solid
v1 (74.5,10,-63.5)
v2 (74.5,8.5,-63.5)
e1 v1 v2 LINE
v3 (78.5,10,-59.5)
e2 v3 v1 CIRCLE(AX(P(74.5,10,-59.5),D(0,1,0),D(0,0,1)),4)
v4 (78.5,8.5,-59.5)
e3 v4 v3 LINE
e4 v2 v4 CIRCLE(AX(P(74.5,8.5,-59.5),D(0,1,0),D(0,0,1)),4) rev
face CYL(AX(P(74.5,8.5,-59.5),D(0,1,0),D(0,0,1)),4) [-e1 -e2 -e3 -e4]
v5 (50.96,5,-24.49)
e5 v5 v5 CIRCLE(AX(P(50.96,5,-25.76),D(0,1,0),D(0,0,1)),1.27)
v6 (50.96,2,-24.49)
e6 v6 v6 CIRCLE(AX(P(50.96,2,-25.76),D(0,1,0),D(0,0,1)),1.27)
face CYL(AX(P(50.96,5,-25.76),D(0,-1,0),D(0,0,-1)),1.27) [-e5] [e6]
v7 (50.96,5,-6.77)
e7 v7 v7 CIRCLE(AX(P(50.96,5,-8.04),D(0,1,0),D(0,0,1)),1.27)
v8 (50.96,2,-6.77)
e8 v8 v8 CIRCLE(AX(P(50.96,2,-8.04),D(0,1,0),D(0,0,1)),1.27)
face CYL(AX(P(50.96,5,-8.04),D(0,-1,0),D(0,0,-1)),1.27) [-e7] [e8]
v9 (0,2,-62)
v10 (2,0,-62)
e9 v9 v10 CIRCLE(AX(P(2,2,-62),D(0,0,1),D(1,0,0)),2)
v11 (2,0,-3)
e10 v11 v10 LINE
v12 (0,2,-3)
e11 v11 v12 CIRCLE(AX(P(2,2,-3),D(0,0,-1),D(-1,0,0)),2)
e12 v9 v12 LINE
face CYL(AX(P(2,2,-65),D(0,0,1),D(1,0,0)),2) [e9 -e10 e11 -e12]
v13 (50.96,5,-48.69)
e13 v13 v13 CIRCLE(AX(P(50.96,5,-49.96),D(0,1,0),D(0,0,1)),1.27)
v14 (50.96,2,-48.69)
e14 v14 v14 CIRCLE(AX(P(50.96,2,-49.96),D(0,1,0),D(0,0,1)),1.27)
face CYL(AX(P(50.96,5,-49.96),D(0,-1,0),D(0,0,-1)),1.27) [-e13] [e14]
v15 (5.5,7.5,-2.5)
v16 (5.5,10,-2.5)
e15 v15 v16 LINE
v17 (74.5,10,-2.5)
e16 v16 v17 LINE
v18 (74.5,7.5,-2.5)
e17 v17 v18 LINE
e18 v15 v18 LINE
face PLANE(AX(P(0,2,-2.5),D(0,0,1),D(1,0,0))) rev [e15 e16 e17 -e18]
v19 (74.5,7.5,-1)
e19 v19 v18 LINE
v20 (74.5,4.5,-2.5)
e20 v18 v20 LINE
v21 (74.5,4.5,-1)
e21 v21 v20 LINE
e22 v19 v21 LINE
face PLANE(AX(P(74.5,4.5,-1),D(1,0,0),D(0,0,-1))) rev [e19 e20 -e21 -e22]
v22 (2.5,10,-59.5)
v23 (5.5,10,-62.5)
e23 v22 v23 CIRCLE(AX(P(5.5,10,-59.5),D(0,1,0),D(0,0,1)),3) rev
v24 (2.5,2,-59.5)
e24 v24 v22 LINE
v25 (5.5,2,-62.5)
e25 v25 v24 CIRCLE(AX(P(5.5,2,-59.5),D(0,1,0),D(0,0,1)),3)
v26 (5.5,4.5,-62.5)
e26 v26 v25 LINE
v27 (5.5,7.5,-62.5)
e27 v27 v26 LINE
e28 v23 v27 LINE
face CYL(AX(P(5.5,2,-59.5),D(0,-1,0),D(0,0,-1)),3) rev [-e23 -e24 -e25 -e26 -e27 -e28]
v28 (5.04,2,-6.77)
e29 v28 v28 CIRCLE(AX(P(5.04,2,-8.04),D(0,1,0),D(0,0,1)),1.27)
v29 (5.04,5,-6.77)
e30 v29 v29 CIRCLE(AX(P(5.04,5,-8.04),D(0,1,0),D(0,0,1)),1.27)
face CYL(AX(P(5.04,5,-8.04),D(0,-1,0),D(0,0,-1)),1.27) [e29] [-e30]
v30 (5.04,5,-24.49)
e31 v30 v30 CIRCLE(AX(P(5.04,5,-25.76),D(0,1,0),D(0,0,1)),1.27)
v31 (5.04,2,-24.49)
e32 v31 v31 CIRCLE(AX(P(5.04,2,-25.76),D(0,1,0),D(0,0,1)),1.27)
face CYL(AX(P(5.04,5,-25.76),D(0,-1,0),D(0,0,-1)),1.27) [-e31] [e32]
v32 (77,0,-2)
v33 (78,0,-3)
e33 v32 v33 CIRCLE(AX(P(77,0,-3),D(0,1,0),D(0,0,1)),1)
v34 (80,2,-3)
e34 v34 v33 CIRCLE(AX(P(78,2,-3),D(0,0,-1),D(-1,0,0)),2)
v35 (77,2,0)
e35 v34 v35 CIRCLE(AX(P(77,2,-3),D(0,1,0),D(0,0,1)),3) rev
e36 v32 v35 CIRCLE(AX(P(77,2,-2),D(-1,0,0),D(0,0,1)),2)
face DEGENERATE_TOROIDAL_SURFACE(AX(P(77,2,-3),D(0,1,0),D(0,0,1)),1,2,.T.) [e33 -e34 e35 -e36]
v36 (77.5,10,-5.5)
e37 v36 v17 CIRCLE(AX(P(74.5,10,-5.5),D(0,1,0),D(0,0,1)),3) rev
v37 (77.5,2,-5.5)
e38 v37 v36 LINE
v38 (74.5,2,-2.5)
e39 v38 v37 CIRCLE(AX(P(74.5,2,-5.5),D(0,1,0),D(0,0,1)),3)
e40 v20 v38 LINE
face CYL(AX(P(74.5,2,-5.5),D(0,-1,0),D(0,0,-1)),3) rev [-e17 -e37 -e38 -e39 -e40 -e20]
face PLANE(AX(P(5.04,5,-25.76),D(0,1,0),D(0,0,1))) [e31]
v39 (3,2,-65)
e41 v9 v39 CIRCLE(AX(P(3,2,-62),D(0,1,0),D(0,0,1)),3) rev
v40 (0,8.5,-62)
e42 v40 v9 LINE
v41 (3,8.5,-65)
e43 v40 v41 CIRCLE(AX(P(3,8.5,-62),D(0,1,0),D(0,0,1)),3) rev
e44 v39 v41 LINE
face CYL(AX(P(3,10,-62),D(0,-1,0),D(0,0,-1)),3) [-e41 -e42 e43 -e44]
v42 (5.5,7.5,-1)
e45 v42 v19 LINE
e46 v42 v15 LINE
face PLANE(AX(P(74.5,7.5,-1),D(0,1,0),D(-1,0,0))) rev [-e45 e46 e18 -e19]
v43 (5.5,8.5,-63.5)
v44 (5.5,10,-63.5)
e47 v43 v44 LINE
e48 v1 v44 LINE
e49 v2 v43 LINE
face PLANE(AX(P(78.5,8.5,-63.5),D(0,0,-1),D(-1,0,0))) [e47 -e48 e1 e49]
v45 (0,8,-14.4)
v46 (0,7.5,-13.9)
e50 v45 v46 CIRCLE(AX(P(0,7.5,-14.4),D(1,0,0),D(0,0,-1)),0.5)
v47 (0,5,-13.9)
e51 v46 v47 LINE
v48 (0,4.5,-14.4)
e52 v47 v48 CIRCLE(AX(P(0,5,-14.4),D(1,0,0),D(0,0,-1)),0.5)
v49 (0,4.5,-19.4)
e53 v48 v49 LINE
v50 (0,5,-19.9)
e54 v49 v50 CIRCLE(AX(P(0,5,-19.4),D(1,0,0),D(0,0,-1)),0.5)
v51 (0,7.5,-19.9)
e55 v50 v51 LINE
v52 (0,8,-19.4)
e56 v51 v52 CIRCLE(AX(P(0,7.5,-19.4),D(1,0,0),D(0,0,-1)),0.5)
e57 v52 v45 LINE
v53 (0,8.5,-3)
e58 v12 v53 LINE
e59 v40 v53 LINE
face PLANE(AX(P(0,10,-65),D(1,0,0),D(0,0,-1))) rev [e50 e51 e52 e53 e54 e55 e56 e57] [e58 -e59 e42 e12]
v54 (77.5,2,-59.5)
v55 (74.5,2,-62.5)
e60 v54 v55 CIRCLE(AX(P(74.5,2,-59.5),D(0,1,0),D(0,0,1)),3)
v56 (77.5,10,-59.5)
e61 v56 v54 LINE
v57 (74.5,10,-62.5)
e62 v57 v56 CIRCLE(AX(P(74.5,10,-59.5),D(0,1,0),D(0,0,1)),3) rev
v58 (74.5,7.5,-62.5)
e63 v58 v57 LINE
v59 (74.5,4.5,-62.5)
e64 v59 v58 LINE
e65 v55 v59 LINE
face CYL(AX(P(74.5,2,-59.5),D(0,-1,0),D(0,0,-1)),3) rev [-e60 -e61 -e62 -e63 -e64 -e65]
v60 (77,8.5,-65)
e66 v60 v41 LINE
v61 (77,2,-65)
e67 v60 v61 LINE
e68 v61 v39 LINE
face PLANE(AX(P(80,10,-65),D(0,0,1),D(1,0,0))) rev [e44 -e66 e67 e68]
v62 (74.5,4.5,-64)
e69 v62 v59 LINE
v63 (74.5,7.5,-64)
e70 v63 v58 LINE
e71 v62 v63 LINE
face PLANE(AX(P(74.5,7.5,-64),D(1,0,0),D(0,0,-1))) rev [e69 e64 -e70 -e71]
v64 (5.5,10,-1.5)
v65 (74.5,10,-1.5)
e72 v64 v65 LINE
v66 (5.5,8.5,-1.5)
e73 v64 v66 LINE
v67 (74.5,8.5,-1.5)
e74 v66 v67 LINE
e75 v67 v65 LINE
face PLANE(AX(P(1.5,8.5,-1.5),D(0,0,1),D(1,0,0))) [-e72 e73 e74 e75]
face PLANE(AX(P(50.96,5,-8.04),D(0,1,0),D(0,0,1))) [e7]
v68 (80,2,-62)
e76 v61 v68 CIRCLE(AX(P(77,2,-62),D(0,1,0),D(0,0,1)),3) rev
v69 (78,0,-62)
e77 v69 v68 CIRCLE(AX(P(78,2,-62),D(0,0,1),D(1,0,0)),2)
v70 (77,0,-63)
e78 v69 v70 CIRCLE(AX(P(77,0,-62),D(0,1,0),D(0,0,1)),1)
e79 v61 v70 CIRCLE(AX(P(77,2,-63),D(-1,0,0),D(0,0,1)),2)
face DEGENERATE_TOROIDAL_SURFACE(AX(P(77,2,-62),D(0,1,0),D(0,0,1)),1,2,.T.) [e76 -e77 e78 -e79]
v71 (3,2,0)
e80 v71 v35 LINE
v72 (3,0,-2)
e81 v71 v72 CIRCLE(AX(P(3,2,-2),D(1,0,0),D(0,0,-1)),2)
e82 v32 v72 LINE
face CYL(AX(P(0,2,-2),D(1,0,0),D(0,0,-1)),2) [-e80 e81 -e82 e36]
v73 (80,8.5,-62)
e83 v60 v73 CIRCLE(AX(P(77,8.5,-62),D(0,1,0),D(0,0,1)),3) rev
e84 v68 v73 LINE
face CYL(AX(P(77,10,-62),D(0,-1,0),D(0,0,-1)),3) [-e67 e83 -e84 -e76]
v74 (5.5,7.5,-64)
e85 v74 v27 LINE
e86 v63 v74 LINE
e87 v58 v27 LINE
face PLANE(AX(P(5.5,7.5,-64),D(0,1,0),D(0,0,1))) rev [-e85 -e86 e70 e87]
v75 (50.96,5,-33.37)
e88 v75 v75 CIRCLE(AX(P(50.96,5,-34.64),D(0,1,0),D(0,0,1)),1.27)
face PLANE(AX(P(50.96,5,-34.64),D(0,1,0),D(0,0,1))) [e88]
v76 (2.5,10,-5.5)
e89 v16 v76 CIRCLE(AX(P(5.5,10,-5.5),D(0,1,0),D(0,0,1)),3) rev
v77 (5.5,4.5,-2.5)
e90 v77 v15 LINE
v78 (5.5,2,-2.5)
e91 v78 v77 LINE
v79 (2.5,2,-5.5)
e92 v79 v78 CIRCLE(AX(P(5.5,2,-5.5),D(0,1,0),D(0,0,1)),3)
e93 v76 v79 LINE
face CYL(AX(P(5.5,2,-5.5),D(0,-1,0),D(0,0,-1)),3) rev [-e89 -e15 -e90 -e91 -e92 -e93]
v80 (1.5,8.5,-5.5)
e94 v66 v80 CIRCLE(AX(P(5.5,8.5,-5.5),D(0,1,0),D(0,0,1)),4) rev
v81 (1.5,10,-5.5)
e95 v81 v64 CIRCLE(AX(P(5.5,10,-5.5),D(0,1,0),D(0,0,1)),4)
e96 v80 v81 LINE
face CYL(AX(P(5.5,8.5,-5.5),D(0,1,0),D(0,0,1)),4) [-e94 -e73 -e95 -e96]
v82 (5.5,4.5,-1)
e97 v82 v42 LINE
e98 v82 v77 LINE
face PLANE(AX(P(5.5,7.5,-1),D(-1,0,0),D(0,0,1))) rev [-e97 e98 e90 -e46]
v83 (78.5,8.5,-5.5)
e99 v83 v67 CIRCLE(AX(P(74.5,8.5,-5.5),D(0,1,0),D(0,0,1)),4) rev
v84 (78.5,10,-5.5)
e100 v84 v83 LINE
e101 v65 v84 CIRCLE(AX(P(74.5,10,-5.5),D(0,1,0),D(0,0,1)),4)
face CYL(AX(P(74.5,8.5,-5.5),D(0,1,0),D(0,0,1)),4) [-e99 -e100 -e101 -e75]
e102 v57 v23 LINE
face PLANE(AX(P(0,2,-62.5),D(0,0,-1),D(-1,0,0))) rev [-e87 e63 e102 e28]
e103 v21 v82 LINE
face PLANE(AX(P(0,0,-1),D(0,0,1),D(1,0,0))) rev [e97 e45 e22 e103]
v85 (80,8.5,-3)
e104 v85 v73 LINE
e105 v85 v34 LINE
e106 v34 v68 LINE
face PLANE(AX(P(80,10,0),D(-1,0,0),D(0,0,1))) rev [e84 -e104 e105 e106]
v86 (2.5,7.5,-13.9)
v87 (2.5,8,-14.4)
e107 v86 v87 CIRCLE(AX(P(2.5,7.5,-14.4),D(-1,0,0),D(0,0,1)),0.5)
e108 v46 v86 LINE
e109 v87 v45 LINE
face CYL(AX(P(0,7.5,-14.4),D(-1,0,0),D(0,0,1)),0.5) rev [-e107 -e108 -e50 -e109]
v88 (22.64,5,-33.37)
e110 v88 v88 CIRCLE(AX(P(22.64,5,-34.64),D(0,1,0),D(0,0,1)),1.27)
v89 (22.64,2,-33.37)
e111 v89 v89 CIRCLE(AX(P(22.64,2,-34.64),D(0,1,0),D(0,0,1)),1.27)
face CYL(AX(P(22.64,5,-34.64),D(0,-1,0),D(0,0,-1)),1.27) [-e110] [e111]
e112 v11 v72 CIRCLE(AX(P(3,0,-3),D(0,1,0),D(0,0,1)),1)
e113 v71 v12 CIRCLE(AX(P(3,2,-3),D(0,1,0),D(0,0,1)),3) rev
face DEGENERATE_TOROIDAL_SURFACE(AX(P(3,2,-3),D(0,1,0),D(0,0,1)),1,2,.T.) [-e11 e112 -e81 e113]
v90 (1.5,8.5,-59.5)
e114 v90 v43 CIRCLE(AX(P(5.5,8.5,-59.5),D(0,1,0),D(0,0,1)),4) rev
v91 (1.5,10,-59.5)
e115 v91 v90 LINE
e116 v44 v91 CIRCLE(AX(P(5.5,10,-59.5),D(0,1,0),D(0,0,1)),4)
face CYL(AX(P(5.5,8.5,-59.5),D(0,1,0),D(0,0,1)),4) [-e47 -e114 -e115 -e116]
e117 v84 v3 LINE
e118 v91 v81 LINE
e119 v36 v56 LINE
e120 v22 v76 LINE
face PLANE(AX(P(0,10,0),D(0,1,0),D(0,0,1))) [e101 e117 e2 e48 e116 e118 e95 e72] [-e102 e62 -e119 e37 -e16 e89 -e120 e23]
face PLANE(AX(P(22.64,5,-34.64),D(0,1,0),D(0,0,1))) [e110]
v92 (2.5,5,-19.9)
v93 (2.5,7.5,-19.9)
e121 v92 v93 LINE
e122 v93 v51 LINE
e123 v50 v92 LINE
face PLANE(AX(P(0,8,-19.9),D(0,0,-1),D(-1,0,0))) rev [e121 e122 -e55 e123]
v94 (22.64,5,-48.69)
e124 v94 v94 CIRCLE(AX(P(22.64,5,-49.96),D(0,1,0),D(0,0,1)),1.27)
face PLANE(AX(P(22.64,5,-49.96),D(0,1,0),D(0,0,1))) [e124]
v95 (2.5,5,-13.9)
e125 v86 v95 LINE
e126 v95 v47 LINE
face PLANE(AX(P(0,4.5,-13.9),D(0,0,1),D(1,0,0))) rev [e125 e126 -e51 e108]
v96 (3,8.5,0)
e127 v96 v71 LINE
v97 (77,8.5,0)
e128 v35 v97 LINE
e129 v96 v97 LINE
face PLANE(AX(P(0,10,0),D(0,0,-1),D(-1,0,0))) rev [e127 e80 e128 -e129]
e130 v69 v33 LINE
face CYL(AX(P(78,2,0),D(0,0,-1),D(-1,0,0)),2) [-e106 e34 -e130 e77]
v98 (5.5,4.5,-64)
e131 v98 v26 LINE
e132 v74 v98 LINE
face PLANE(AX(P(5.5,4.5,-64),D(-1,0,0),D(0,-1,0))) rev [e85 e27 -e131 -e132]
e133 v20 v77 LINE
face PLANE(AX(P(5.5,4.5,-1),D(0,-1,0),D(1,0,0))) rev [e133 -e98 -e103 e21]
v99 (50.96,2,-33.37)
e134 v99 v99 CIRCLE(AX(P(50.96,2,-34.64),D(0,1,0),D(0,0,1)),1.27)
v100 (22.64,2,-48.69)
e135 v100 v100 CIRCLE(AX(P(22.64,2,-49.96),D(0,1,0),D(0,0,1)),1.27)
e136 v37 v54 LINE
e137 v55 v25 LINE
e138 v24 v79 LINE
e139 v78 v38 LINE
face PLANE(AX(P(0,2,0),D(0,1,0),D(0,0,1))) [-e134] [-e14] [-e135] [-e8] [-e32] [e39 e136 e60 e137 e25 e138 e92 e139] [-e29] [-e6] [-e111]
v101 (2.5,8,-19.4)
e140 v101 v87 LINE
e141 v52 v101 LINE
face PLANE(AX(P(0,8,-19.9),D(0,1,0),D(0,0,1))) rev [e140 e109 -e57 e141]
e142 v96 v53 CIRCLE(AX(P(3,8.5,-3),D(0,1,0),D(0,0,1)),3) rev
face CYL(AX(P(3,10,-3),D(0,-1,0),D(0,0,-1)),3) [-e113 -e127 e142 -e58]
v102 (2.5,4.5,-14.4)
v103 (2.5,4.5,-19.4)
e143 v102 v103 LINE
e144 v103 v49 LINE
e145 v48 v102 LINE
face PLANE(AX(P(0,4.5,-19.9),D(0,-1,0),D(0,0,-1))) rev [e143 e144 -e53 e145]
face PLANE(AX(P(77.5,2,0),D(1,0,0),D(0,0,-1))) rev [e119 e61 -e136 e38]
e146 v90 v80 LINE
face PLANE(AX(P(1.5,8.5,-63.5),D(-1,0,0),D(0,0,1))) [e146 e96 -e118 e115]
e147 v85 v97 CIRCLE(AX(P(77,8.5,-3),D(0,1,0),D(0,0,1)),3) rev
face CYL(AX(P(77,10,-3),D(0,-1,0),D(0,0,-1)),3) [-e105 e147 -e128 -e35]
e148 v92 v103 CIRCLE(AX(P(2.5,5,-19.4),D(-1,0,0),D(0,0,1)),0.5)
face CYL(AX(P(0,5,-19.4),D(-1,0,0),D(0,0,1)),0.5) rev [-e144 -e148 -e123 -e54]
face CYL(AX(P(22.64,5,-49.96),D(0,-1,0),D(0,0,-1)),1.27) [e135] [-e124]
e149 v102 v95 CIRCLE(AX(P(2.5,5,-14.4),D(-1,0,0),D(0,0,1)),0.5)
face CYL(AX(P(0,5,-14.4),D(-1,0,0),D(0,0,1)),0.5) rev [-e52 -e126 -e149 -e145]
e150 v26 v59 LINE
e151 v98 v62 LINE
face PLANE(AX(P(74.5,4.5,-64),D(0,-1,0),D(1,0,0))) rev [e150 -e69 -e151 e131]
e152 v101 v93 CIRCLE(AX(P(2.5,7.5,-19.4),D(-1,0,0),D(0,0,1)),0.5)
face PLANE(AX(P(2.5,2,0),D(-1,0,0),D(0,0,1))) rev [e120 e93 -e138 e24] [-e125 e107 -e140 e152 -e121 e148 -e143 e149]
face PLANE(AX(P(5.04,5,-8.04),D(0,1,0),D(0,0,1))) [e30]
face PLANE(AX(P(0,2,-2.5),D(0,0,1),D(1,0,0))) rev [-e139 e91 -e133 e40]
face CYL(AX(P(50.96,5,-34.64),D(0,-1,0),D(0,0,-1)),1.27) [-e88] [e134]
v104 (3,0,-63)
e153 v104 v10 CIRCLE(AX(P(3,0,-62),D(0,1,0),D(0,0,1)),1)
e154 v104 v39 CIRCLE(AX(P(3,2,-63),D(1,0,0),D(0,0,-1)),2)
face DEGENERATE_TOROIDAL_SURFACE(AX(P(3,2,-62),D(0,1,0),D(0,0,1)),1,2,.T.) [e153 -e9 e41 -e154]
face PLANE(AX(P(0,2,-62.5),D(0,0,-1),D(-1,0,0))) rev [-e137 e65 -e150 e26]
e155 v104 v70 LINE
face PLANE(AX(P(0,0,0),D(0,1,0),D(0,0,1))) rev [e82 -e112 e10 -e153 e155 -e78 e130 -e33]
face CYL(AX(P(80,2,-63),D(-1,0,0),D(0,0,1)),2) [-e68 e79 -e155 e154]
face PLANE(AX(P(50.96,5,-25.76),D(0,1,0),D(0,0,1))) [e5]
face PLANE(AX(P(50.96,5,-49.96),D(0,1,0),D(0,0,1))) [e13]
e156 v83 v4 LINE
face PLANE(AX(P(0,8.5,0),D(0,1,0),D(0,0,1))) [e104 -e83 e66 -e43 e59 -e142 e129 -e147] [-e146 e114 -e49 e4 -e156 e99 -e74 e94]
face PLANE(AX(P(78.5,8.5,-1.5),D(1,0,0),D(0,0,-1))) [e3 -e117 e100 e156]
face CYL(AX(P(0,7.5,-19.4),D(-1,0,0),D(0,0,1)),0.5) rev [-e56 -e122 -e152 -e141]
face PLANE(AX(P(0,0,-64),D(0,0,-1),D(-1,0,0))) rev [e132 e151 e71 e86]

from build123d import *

# Parameters (mm, degrees)
SKETCH1_W           = 80
SKETCH1_H           = 65
BOSS_EXTRUDE1_DEPTH = 10
SKETCH2_W           = 75
SKETCH2_H           = 60
CUT_EXTRUDE1_DEPTH  = 8
FILLET4_R           = 2
FILLET5_R           = 3
SKETCH3_W           = 80
SKETCH3_H           = 65
SKETCH3_W_2         = 77
SKETCH3_H_2         = 62
CUT_EXTRUDE2_DEPTH  = 1.5
FILLET7_R           = 4
SKETCH4_R           = 1.27
BOSS_EXTRUDE2_DEPTH = 3
SKETCH5_W           = 6
SKETCH5_H           = 3.5
CUT_EXTRUDE3_DEPTH  = 102.642756751
FILLET8_R           = 0.5
SKETCH8_W           = 69
SKETCH8_H           = 3
CUT_EXTRUDE4_DEPTH  = 1.5
SKETCH9_W           = 69
SKETCH9_H           = 3
CUT_EXTRUDE5_DEPTH  = 1.5


with BuildPart() as part:
    # Sketch1 → Boss-Extrude1 (new body)
    with BuildSketch(Plane(origin=(0, 0, 0), x_dir=(1, 0, 0), z_dir=(0, 1, 0))):
        with Locations((40, 32.5)):
            Rectangle(SKETCH1_W, SKETCH1_H)
    extrude(amount=BOSS_EXTRUDE1_DEPTH)

    # Sketch2 → Cut-Extrude1 (cut)
    with BuildSketch(Plane(origin=(0, 10, 0), x_dir=(1, 0, 0), z_dir=(0, 1, 0))):
        with Locations((40, 32.5)):
            Rectangle(SKETCH2_W, SKETCH2_H)
    extrude(amount=-CUT_EXTRUDE1_DEPTH, mode=Mode.SUBTRACT)

    # Fillet4
    fillet4_edges = [part.edges().sort_by_distance(p)[0] for p in [
        (40, 0, -65),
        (80, 0, -32.5),
        (40, 0, 0),
        (0, 0, -32.5),
    ]]
    fillet(fillet4_edges, radius=FILLET4_R)

    # Fillet5
    # the kernel refuses this fillet: 3 mm, written as the material it adds along each edge
    with BuildSketch(Plane(origin=(2.5, 10, -2.5), x_dir=(0, 0, -1), z_dir=(0, -1, 0)), Plane(origin=(77.5, 10, -62.5), x_dir=(0, 0, 1), z_dir=(0, -1, 0)), Plane(origin=(77.5, 10, -2.5), x_dir=(-1, 0, 0), z_dir=(0, -1, 0))) as fillet5_piece_1:
        with BuildLine():
            CenterArc((FILLET5_R, FILLET5_R), FILLET5_R, 180, 90)
            Line((0, FILLET5_R), (0, 0))
            Line((0, 0), (FILLET5_R, 0))
        make_face()
    extrude(amount=8)
    with BuildSketch(Plane(origin=(2.5, 10, -62.5), x_dir=(0, 0, 1), z_dir=(0, -1, 0))) as fillet5_piece_2:
        with BuildLine():
            CenterArc((FILLET5_R, -FILLET5_R), FILLET5_R, 90, 90)
            Line((0, -FILLET5_R), (0, 0))
            Line((0, 0), (FILLET5_R, 0))
        make_face()
    extrude(amount=8)
    # the kernel refuses this fillet: 3 mm, written as the material it takes off along each edge
    with BuildSketch(Plane(origin=(77, 0, -62), x_dir=(0, 0, -1), z_dir=(-1, 0, 0))) as fillet5_2_piece_1:
        with BuildLine():
            CenterArc((1, -2), 2, 0, 90)
            Line((3, -2), (3, 0))
            Line((3, 0), (1, 0))
        make_face()
    revolve(axis=Axis((77, 0, -62), (0, -1, 0)), revolution_arc=90, mode=Mode.SUBTRACT)
    with BuildSketch(Plane(origin=(77, 0, -3), x_dir=(1, 0, 0), z_dir=(0, 0, -1))) as fillet5_2_piece_2:
        with BuildLine():
            CenterArc((1, -2), 2, 0, 90)
            Line((3, -2), (3, 0))
            Line((3, 0), (1, 0))
        make_face()
    revolve(axis=Axis((77, 0, -3), (0, -1, 0)), revolution_arc=90, mode=Mode.SUBTRACT)
    with BuildSketch(Plane(origin=(3, 0, -62), x_dir=(-1, 0, 0), z_dir=(0, 0, 1))) as fillet5_2_piece_3:
        with BuildLine():
            CenterArc((1, -2), 2, 0, 90)
            Line((3, -2), (3, 0))
            Line((3, 0), (1, 0))
        make_face()
    revolve(axis=Axis((3, 0, -62), (0, -1, 0)), revolution_arc=90, mode=Mode.SUBTRACT)
    with BuildSketch(Plane(origin=(3, 0, -3), x_dir=(0, 0, 1), z_dir=(1, 0, 0))) as fillet5_2_piece_4:
        with BuildLine():
            CenterArc((1, -2), 2, 0, 90)
            Line((3, -2), (3, 0))
            Line((3, 0), (1, 0))
        make_face()
    revolve(axis=Axis((3, 0, -3), (0, -1, 0)), revolution_arc=90, mode=Mode.SUBTRACT)
    with BuildSketch(Plane(origin=(0, 0, -65), x_dir=(0, 0, 1), z_dir=(0, 1, 0)), Plane(origin=(0, 0, 0), x_dir=(1, 0, 0), z_dir=(0, 1, 0))) as fillet5_2_piece_5:
        with BuildLine():
            CenterArc((FILLET5_R, FILLET5_R), FILLET5_R, 180, 90)
            Line((0, FILLET5_R), (0, 0))
            Line((0, 0), (FILLET5_R, 0))
        make_face()
    extrude(amount=17.5, mode=Mode.SUBTRACT)
    with BuildSketch(Plane(origin=(80, 0, -65), x_dir=(0, 0, 1), z_dir=(0, 1, 0)), Plane(origin=(80, 0, 0), x_dir=(-1, 0, 0), z_dir=(0, 1, 0))) as fillet5_2_piece_6:
        with BuildLine():
            CenterArc((FILLET5_R, -FILLET5_R), FILLET5_R, 90, 90)
            Line((0, -FILLET5_R), (0, 0))
            Line((0, 0), (FILLET5_R, 0))
        make_face()
    extrude(amount=17.5, mode=Mode.SUBTRACT)

    # Sketch3 → Cut-Extrude2 (cut)
    with BuildSketch(Plane(origin=(0, 10, 0), x_dir=(1, 0, 0), z_dir=(0, 1, 0))):
        with Locations((40, 32.5)):
            Rectangle(SKETCH3_W, SKETCH3_H)
        with Locations((40, 32.5)):
            Rectangle(SKETCH3_W_2, SKETCH3_H_2, mode=Mode.SUBTRACT)
    extrude(amount=-CUT_EXTRUDE2_DEPTH, mode=Mode.SUBTRACT)

    # Fillet7
    fillet7_edges = [part.edges().sort_by_distance(p)[0] for p in [
        (78.5, 9.25, -63.5),
        (78.5, 9.25, -1.5),
        (1.5, 9.25, -1.5),
        (1.5, 9.25, -63.5),
    ]]
    fillet(fillet7_edges, radius=FILLET7_R)

    # Sketch4 → Boss-Extrude2 (add)
    with BuildSketch(Plane(origin=(0, 2, 0), x_dir=(1, 0, 0), z_dir=(0, 1, 0))):
        with Locations(Location((5.04, 8.04, 0), (0, 0, 270))):
            Circle(SKETCH4_R)
        with Locations(Location((5.04, 25.76, 0), (0, 0, 270))):
            Circle(SKETCH4_R)
        with Locations(Location((22.64, 34.64, 0), (0, 0, 270))):
            Circle(SKETCH4_R)
        with Locations(Location((22.64, 49.96, 0), (0, 0, 270))):
            Circle(SKETCH4_R)
        with Locations(Location((50.96, 8.04, 0), (0, 0, 270))):
            Circle(SKETCH4_R)
        with Locations(Location((50.96, 25.76, 0), (0, 0, 270))):
            Circle(SKETCH4_R)
        with Locations(Location((50.96, 34.64, 0), (0, 0, 270))):
            Circle(SKETCH4_R)
        with Locations(Location((50.96, 49.96, 0), (0, 0, 270))):
            Circle(SKETCH4_R)
    extrude(amount=BOSS_EXTRUDE2_DEPTH)

    # Sketch5 → Cut-Extrude3 (cut, through all)
    with BuildSketch(Plane(origin=(2.5, 0, 0), x_dir=(0, 0, -1), z_dir=(1, 0, 0))):
        with Locations((16.9, 6.25)):
            Rectangle(SKETCH5_W, SKETCH5_H)
    extrude(amount=-CUT_EXTRUDE3_DEPTH, mode=Mode.SUBTRACT)

    # Fillet8
    fillet8_edges = [part.edges().sort_by_distance(p)[0] for p in [
        (1.25, 4.5, -19.9),
        (1.25, 4.5, -13.9),
        (1.25, 8, -13.9),
        (1.25, 8, -19.9),
    ]]
    fillet(fillet8_edges, radius=FILLET8_R)

    # Sketch8 → Cut-Extrude4 (cut)
    with BuildSketch(Plane.XY.offset(-62.5)):
        with Locations((40, 6)):
            Rectangle(SKETCH8_W, SKETCH8_H)
    extrude(amount=-CUT_EXTRUDE4_DEPTH, mode=Mode.SUBTRACT)

    # Sketch9 → Cut-Extrude5 (cut)
    with BuildSketch(Plane(origin=(0, 0, -2.5), x_dir=(-1, 0, 0), z_dir=(0, 0, -1))):
        with Locations((-40, 6)):
            Rectangle(SKETCH9_W, SKETCH9_H)
    extrude(amount=-CUT_EXTRUDE5_DEPTH, mode=Mode.SUBTRACT)


solid = part.part
